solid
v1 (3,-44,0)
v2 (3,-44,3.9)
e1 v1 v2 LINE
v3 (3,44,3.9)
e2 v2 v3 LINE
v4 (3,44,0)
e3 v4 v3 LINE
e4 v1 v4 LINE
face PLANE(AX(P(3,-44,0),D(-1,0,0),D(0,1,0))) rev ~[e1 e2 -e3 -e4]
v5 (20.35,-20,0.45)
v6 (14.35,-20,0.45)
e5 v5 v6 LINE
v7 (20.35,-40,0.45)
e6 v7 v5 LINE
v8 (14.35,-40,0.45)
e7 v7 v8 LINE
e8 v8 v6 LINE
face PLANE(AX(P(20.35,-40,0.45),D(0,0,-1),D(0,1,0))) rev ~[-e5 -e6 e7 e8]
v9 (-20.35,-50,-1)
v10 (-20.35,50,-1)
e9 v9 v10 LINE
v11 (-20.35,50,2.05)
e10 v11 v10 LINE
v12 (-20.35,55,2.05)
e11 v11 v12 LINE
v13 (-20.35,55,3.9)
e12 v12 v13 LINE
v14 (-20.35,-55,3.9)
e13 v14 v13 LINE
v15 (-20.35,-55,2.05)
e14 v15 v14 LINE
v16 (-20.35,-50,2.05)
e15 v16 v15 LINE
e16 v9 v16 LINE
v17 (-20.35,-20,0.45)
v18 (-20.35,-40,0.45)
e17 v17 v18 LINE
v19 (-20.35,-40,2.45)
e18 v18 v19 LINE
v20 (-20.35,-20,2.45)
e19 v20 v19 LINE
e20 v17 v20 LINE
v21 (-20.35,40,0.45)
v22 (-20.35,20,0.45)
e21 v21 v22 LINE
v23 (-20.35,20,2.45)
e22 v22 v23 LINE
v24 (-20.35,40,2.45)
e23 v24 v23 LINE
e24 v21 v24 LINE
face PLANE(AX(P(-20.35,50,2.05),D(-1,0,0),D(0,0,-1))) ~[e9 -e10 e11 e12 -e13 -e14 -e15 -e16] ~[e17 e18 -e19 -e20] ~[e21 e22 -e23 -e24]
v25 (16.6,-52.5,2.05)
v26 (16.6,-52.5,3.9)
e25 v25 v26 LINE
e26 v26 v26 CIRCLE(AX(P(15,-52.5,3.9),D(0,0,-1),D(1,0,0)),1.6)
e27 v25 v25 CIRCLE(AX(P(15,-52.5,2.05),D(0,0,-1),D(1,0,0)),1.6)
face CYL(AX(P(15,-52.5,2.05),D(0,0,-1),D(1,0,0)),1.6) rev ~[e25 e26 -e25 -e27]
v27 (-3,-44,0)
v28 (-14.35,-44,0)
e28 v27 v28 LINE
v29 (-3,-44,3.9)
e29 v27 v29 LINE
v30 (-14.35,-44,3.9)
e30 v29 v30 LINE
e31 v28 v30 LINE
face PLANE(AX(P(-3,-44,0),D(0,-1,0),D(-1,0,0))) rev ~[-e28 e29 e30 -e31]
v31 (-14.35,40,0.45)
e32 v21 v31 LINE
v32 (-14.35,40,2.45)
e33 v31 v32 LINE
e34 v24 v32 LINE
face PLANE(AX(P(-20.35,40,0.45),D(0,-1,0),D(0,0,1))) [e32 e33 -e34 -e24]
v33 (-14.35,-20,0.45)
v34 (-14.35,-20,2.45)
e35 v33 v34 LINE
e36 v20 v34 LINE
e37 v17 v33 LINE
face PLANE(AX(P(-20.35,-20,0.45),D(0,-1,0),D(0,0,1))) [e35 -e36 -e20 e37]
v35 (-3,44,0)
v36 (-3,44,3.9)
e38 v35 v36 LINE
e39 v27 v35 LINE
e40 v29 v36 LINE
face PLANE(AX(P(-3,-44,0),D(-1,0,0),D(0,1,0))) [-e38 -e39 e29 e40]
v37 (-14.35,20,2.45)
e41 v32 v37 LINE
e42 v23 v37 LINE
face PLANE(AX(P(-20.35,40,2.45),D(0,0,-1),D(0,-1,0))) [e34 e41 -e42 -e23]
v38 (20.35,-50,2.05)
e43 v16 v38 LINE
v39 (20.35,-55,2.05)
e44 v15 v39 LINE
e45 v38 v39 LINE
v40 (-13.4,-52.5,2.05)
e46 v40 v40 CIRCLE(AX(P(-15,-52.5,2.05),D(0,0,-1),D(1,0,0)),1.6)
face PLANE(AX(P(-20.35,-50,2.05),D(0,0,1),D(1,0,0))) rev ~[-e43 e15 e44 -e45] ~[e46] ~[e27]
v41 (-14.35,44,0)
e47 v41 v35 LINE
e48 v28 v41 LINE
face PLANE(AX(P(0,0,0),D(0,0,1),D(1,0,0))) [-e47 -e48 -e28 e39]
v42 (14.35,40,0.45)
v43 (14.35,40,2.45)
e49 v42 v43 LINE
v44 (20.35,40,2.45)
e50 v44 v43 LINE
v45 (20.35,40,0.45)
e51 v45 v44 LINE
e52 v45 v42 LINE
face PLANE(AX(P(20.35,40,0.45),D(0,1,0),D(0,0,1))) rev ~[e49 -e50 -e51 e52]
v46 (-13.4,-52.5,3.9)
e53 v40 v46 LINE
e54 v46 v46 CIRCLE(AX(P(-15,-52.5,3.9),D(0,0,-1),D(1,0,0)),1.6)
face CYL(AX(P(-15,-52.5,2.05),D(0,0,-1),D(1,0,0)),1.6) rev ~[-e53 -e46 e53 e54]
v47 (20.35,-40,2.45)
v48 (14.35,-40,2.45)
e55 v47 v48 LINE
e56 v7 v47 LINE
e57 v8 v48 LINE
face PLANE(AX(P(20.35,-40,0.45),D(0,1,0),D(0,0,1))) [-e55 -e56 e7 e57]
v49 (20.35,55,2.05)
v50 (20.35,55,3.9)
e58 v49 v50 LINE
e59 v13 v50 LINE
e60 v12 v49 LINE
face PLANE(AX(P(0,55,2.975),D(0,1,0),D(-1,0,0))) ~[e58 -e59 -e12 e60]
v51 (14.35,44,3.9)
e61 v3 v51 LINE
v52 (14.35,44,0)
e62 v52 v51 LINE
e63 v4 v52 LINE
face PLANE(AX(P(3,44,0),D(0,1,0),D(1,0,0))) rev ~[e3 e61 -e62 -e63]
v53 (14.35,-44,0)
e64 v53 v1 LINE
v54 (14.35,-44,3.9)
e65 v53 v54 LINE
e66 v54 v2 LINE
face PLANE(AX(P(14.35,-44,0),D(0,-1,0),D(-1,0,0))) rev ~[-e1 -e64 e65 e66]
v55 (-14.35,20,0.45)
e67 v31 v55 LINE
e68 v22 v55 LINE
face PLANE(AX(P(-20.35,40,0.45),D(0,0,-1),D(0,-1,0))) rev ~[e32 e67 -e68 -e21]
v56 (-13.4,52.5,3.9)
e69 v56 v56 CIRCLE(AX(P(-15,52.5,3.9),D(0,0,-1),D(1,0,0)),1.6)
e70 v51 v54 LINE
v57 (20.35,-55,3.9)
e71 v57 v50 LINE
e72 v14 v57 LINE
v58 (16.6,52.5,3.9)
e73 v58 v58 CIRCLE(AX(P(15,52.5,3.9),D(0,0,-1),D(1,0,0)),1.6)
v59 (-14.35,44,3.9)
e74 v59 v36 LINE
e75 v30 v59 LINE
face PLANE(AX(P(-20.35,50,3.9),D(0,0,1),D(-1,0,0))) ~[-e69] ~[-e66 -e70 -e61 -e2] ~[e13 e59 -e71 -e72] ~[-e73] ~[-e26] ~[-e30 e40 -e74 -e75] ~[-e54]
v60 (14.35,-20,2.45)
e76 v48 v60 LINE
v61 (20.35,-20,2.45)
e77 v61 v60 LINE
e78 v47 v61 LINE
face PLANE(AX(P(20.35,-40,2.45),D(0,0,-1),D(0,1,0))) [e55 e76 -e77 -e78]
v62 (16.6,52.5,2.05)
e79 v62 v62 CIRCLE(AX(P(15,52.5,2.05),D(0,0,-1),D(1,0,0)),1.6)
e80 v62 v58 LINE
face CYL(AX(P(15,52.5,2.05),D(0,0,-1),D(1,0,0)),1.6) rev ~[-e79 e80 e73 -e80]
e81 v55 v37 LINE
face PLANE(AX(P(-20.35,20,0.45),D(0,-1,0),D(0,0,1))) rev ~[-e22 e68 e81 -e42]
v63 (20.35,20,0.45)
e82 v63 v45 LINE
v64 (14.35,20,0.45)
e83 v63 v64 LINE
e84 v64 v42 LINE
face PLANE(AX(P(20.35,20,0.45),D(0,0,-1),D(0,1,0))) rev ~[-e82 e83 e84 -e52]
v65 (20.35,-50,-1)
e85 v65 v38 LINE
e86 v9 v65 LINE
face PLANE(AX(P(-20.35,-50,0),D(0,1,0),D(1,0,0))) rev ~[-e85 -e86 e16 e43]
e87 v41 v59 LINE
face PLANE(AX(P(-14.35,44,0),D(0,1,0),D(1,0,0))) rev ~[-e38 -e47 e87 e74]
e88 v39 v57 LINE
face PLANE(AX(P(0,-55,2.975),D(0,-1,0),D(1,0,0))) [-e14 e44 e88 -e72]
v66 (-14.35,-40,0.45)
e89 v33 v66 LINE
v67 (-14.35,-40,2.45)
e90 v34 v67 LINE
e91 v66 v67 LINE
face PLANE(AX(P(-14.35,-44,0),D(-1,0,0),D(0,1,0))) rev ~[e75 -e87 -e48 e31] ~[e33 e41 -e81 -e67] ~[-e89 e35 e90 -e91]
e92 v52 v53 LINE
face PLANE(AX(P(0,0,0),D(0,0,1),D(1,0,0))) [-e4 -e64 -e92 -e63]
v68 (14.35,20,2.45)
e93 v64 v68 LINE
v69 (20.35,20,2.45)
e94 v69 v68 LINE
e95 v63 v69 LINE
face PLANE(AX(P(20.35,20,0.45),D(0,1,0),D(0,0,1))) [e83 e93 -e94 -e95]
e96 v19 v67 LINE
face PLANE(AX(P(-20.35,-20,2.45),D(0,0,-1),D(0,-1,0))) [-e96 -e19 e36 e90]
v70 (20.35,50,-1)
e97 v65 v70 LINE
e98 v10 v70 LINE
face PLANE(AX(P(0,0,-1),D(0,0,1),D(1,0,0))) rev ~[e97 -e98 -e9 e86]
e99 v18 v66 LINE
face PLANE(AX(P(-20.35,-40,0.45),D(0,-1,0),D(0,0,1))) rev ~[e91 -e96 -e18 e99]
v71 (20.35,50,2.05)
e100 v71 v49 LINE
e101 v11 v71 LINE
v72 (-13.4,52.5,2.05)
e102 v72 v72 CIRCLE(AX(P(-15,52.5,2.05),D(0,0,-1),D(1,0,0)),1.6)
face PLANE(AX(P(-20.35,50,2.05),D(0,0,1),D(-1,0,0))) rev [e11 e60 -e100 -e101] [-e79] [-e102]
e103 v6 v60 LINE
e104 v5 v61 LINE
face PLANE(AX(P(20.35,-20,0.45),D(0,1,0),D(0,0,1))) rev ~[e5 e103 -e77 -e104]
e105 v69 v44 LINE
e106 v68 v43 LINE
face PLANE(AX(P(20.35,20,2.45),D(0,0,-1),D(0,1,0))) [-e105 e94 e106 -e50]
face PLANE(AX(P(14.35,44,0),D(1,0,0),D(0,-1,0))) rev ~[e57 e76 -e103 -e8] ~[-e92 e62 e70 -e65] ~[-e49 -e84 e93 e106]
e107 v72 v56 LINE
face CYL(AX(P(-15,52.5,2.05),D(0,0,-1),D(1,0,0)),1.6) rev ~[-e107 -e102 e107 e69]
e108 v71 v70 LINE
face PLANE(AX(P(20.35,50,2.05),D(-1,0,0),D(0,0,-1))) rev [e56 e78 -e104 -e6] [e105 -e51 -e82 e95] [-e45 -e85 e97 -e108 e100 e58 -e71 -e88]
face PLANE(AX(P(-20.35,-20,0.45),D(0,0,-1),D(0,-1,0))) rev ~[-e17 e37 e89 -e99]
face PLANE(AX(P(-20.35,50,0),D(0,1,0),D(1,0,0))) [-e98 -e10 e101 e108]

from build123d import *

# Parameters (mm, degrees)
F0_W      = 40.7
F0_H      = 100
F1_DEPTH  = 1
F2_W      = 40.7
F2_H      = 100
F2_W_2    = 6
F2_H_2    = 88
F3_DEPTH  = 3.9
F4_W      = 40.7
F4_H      = 1.85
F5_DEPTH  = 5
F6_R      = 1.6
F7_DEPTH  = 1.851
F8_W      = 20
F8_H      = 2
F9_DEPTH  = 6
F10_W     = 20
F10_H     = 2
F11_DEPTH = 6


# Not quite as in the source:
# - a pattern or mirror of a feature is missing from the dataset's text; its kind, count and spacing are read off the source's solid


with BuildPart() as f1:
    # F0 (on Top) → F1 (new body)
    with BuildSketch(Plane.XY):
        Rectangle(F0_W, F0_H)
    extrude(amount=-F1_DEPTH)

    # F2 (on Top) → F3 (join)
    with BuildSketch(Plane.XY):
        Rectangle(F2_W, F2_H)
        Polygon((-14.35, -44), (-14.35, 44), (-3, 44), (3, 44), (14.35, 44), (14.35, -44), (3, -44), (-3, -44), align=None, mode=Mode.SUBTRACT)
        Rectangle(F2_W_2, F2_H_2)
    extrude(amount=F3_DEPTH)

    # F4 (on face) → F5 (join)
    with BuildSketch(Plane.XZ.offset(50)):
        with Locations((0, 2.975)):
            Rectangle(F4_W, F4_H)
    f5 = extrude(amount=F5_DEPTH)

    # F5_copies: F5 across plane
    add(f5.mirror(Plane.ZX))

    # F6 (on face) → F7 (cut, through all)
    with BuildSketch(Plane(origin=(0, 0, 2.05), x_dir=(1, 0, 0), z_dir=(0, 0, -1))):
        with Locations((-15, 52.5)):
            Circle(F6_R)
        with Locations((15, 52.5)):
            Circle(F6_R)
        with Locations((-15, -52.5)):
            Circle(F6_R)
        with Locations((15, -52.5)):
            Circle(F6_R)
    extrude(amount=-F7_DEPTH, mode=Mode.SUBTRACT)

    # F8 (on face) → F9 (cut, through all)
    with BuildSketch(Plane(origin=(-20.35, 0, 0), x_dir=(0, -1, 0), z_dir=(-1, 0, 0))):
        with Locations((-30, 1.45)):
            Rectangle(F8_W, F8_H)
        with Locations((30, 1.45)):
            Rectangle(F8_W, F8_H)
    extrude(amount=-F9_DEPTH, mode=Mode.SUBTRACT)

    # F10 (on face) → F11 (cut, through all)
    with BuildSketch(Plane.YZ.offset(20.35)):
        with Locations((-30, 1.45)):
            Rectangle(F10_W, F10_H)
        with Locations((30, 1.45)):
            Rectangle(F10_W, F10_H)
    extrude(amount=-F11_DEPTH, mode=Mode.SUBTRACT)


solid = f1.part
